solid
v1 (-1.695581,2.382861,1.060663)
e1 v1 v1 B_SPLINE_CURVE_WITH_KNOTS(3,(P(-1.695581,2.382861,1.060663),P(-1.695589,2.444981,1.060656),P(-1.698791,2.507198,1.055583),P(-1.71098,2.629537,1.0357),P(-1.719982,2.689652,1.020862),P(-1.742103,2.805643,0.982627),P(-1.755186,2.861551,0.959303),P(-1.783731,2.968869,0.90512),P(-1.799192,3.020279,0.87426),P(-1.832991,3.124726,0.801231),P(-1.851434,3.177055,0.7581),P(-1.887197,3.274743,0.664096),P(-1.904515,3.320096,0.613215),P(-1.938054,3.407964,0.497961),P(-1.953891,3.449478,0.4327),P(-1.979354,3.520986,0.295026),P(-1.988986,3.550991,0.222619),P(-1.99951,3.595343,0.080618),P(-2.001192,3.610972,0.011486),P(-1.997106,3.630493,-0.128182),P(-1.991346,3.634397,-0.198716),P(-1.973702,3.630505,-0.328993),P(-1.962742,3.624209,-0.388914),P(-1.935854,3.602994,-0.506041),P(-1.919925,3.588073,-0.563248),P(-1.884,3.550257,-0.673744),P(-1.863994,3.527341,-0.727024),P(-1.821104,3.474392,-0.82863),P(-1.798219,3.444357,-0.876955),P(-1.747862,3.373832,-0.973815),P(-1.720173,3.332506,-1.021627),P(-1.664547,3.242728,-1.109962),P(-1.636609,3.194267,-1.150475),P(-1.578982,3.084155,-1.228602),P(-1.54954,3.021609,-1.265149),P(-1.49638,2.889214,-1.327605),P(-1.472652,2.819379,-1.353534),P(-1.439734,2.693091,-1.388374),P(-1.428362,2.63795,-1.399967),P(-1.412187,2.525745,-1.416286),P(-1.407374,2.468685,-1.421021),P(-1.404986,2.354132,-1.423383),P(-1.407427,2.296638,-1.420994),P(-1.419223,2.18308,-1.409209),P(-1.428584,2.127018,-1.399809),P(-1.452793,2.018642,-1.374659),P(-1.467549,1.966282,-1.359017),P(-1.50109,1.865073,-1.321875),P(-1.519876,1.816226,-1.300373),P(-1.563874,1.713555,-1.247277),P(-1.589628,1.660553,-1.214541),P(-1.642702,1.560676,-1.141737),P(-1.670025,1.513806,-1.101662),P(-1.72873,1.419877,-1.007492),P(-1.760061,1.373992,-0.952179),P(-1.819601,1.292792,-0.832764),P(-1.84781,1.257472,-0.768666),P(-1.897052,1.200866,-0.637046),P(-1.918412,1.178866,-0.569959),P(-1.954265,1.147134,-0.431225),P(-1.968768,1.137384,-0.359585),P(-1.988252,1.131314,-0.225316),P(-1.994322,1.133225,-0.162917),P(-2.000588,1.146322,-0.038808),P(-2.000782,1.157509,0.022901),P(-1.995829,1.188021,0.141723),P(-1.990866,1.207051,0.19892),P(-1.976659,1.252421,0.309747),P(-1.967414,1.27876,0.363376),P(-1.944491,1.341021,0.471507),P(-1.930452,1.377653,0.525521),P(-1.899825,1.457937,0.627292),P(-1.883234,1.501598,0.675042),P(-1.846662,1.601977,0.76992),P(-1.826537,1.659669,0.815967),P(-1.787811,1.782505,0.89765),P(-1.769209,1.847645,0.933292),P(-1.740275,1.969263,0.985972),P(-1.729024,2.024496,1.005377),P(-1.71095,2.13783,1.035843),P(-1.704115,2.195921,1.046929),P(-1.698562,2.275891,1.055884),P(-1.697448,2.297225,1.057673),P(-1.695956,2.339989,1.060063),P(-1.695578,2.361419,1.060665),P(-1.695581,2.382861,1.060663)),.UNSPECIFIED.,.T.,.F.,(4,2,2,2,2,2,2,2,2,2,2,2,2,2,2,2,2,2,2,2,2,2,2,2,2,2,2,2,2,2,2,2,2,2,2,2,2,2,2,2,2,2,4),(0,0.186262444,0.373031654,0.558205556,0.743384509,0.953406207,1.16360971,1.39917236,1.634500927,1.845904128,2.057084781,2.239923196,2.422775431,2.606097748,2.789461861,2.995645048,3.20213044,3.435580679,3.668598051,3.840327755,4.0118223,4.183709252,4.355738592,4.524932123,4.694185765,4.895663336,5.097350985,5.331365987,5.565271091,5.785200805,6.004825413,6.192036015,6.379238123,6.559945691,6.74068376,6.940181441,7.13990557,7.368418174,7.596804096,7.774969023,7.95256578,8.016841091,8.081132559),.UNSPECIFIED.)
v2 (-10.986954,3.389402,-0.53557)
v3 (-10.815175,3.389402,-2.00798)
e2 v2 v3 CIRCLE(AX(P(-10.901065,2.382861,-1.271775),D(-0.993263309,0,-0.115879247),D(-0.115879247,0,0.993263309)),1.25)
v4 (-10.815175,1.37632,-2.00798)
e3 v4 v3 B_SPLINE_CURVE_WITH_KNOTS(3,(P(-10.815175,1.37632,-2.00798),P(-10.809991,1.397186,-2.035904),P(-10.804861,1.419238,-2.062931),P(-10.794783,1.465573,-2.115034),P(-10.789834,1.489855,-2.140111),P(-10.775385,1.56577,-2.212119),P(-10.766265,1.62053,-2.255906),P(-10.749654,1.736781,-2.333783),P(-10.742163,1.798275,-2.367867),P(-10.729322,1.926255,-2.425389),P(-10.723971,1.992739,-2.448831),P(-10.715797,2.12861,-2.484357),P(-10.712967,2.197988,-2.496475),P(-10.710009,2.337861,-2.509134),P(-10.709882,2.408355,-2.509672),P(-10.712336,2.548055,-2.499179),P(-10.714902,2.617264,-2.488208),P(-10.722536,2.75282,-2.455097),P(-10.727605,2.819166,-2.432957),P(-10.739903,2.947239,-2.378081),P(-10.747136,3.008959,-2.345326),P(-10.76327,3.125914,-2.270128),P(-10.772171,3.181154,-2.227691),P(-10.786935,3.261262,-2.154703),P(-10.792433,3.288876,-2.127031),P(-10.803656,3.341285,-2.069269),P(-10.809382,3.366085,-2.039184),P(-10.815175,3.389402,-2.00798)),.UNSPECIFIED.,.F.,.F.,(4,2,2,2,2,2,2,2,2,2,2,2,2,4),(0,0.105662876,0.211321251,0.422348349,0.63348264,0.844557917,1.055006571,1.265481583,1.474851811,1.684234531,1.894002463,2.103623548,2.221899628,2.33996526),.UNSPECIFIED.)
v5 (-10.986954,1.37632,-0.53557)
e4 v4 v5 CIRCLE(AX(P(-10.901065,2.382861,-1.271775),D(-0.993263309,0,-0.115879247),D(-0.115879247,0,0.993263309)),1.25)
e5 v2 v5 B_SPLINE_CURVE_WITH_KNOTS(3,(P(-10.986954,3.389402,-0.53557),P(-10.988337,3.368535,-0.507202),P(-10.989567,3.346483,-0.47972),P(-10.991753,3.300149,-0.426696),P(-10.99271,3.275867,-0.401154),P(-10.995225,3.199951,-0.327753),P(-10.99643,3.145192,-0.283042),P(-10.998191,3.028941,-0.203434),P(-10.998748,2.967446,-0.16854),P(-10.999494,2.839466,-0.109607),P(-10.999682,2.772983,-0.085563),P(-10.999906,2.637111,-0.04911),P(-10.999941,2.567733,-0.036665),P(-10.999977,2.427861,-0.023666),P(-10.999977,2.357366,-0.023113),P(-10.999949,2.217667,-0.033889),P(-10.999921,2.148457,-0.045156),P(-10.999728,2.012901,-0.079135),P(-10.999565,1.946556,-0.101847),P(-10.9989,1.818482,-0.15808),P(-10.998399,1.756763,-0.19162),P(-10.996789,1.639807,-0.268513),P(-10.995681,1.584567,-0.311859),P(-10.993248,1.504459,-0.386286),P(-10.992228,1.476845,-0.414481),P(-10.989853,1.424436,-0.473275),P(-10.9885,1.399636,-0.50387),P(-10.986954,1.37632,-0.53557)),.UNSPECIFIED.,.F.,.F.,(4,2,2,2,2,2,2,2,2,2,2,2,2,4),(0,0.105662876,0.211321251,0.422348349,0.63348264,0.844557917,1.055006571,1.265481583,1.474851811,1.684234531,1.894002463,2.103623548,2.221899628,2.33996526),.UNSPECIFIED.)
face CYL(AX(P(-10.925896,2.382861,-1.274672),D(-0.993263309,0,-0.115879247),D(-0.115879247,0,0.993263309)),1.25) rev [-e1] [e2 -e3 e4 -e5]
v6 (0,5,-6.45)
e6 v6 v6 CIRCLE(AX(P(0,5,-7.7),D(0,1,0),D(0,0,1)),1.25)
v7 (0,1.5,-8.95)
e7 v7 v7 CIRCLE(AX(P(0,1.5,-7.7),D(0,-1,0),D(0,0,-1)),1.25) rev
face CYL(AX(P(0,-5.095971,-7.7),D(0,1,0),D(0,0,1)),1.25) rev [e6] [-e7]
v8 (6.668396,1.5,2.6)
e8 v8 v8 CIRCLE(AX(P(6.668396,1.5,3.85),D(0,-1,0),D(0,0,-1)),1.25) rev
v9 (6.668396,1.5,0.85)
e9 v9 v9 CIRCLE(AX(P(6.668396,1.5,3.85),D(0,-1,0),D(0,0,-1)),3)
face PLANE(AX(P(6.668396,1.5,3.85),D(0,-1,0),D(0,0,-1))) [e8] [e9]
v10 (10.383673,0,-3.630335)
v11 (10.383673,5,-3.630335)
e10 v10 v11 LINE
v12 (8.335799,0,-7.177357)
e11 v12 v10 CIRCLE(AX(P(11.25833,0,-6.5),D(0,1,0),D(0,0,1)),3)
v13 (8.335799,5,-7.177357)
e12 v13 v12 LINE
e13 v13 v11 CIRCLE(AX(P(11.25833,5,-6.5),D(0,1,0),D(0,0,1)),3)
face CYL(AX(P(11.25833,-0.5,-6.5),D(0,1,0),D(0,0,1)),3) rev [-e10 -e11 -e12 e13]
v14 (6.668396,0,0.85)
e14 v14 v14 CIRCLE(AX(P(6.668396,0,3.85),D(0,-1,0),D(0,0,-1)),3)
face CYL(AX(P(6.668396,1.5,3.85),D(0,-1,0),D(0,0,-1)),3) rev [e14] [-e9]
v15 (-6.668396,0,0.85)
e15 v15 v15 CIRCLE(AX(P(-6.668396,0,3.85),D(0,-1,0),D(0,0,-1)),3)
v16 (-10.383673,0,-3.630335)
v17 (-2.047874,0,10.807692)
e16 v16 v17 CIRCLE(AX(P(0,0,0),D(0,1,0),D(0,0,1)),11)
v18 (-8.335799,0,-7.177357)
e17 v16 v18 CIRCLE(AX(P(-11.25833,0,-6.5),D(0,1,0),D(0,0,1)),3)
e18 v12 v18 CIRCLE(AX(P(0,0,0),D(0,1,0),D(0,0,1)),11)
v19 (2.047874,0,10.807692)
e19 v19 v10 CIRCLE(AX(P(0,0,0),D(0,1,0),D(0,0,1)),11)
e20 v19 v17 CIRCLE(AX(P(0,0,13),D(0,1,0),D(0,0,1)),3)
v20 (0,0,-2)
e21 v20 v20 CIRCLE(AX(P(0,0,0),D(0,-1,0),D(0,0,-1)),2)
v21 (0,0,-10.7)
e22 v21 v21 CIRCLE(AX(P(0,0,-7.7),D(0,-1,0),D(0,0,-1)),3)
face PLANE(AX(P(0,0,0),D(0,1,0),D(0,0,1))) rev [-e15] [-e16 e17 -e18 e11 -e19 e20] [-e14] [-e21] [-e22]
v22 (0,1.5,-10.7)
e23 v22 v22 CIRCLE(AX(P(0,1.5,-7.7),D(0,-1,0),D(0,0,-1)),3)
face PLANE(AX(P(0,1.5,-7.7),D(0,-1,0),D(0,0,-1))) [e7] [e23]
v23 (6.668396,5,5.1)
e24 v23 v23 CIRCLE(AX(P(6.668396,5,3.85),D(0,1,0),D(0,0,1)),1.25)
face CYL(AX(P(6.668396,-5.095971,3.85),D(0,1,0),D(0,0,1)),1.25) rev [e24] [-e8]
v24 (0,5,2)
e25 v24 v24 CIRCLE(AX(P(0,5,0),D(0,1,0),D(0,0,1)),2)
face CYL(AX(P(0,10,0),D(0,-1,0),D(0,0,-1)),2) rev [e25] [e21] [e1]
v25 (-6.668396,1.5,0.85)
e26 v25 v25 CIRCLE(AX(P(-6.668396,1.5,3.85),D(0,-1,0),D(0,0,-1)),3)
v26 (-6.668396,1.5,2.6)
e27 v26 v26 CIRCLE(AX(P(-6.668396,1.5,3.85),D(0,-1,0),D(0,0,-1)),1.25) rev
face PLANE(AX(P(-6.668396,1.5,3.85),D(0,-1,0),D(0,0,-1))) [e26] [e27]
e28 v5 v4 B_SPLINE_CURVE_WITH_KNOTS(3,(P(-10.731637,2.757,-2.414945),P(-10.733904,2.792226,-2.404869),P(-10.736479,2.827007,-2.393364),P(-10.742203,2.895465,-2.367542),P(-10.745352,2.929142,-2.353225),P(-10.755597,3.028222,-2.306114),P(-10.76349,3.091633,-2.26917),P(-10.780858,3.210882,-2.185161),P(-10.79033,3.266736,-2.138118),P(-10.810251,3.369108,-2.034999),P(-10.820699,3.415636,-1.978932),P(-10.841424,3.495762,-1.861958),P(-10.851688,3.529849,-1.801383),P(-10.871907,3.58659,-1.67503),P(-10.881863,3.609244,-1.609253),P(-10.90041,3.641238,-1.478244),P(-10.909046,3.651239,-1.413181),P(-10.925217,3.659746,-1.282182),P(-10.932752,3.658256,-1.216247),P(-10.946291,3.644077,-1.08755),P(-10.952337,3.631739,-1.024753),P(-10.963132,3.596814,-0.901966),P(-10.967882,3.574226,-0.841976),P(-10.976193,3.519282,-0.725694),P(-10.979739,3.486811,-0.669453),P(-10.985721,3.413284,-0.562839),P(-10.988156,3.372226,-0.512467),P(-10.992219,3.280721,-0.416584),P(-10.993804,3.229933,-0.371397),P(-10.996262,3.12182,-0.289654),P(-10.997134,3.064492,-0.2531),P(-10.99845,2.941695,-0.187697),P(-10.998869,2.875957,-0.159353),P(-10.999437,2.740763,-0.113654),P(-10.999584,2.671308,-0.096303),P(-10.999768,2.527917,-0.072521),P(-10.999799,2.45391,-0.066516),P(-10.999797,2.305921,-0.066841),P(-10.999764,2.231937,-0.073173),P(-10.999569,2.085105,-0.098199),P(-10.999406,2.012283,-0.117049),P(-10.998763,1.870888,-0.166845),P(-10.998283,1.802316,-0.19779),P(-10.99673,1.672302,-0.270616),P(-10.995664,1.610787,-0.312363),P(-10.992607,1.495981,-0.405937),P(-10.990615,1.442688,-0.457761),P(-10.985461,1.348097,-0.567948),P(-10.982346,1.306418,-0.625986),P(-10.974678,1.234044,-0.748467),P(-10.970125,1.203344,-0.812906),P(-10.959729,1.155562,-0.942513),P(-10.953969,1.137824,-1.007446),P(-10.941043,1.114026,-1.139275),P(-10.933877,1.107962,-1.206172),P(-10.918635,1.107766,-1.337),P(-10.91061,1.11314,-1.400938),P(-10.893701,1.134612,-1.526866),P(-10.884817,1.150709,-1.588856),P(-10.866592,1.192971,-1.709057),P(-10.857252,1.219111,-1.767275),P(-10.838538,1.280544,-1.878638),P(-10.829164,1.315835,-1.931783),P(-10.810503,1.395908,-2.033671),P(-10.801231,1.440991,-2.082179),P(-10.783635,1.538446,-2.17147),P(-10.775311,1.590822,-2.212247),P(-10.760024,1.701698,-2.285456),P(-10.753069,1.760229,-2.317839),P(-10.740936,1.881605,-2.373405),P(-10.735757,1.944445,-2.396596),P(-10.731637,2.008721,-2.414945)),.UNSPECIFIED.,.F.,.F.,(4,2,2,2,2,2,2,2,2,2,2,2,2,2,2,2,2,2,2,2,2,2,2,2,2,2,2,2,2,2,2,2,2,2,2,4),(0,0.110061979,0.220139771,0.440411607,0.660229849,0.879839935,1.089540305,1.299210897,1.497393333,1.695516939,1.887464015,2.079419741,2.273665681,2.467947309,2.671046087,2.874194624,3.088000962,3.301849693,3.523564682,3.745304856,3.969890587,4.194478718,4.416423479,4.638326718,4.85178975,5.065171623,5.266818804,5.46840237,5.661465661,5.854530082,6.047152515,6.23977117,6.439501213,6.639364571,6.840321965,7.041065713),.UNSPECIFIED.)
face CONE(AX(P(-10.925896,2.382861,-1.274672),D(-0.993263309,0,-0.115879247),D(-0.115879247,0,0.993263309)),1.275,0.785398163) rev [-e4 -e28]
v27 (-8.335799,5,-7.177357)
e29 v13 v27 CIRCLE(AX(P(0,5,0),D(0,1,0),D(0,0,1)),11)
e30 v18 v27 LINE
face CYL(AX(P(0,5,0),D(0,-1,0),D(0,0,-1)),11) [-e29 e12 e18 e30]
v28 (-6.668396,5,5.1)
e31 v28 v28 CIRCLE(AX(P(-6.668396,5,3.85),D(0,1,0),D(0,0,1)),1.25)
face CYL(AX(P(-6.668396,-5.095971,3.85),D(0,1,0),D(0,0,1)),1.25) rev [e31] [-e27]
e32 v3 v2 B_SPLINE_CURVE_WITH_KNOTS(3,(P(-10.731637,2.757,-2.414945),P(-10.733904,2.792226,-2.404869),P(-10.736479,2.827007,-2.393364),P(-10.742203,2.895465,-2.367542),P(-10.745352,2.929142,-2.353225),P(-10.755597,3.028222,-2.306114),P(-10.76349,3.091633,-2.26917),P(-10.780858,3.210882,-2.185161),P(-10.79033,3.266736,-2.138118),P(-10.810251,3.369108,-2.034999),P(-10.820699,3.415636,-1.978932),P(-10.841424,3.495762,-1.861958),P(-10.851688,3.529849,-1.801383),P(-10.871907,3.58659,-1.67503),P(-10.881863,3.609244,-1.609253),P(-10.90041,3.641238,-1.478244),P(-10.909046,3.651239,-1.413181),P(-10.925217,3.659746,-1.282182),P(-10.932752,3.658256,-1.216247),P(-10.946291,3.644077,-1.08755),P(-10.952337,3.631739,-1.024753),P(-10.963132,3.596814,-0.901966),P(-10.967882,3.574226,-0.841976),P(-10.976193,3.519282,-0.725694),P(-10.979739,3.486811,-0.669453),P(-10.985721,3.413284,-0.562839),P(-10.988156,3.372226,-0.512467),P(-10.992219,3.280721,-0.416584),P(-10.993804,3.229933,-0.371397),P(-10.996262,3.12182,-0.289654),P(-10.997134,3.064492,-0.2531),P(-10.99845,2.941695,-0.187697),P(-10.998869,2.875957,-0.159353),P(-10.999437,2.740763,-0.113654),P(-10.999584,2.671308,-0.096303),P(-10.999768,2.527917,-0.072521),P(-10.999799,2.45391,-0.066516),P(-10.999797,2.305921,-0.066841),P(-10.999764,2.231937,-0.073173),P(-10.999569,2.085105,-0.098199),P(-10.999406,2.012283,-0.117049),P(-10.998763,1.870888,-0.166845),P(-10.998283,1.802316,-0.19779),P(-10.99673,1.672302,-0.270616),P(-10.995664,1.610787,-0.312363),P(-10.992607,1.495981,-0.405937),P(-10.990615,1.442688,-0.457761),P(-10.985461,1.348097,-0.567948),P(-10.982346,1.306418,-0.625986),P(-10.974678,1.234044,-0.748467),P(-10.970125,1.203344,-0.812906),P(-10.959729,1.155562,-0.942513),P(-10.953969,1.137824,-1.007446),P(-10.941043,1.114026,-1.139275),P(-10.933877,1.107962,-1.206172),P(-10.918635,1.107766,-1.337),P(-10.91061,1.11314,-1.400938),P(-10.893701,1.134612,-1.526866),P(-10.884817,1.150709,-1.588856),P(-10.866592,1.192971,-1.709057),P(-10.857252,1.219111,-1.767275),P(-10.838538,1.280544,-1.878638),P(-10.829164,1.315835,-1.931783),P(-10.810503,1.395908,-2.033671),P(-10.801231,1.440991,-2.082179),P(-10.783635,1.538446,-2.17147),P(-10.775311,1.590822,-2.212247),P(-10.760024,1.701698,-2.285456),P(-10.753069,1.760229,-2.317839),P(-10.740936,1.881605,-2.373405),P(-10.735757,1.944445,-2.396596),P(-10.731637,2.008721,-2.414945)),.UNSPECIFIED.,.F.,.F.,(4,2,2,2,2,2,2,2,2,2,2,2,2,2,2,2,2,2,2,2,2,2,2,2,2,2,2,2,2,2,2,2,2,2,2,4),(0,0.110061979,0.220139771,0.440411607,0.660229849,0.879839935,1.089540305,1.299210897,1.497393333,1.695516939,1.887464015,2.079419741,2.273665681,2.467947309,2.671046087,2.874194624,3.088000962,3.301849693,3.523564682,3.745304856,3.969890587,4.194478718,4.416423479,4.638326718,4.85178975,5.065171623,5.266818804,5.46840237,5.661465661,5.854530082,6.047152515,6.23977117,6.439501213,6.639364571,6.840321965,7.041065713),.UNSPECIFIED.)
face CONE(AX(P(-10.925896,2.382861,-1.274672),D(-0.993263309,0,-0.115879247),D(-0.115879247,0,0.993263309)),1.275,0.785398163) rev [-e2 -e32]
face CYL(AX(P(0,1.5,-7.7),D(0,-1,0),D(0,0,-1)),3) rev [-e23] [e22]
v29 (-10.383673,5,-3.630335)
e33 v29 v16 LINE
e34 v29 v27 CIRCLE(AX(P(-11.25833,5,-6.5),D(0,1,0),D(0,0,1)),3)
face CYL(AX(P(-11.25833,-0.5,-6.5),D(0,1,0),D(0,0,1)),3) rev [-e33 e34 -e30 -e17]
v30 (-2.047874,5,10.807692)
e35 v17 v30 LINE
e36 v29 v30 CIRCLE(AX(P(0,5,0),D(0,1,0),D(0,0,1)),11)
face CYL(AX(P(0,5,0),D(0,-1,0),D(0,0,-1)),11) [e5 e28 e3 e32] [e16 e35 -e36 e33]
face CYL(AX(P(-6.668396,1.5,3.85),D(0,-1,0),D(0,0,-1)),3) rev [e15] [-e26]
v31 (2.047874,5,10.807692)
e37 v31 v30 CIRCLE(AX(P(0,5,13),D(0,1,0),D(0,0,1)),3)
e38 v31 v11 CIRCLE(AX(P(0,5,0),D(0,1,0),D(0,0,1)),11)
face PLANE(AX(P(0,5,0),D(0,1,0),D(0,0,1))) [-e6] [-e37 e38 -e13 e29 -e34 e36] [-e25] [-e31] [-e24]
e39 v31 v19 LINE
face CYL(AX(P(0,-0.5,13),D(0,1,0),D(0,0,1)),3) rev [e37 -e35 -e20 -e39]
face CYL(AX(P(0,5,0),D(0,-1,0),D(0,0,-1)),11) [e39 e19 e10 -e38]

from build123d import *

# Parameters (mm, degrees)
ESBO_O1_R                = 11
RESSALTO_EXTRUS_O1_DEPTH = 5
ESBO_O3_R                = 1.25
CORTE_EXTRUS_O1_DEPTH    = 10.095971114
ESBO_O22_R               = 3
CORTE_EXTRUS_O6_DEPTH    = 5.5
ESBO_O23_R               = 3
CORTE_EXTRUS_O7_DEPTH    = 1.5
ESBO_O27_R               = 2
CORTE_EXTRUS_O8_DEPTH    = 10


# Read off the part's stored shape, not the designer's step: Broca de rosquear para tarraxa de M3x0.52
with BuildPart() as part:
    # Esboço1 → Ressalto-extrusão1 (new body)
    with BuildSketch(Plane(origin=(0, 0, 0), x_dir=(1, 0, 0), z_dir=(0, 1, 0))):
        with Locations(Location((0, 0, 0), (0, 0, 270))):
            Circle(ESBO_O1_R)
    extrude(amount=RESSALTO_EXTRUS_O1_DEPTH)

    # Esboço3 → Corte-extrusão1 (cut)
    with BuildSketch(Plane(origin=(0, 5, 0), x_dir=(1, 0, 0), z_dir=(0, 1, 0))):
        with Locations(Location((0, 7.7, 0), (0, 0, 270))):
            Circle(ESBO_O3_R)
        with Locations(Location((6.668395609, -3.85, 0), (0, 0, 270))):
            Circle(ESBO_O3_R)
        with Locations(Location((-6.668395609, -3.85, 0), (0, 0, 270))):
            Circle(ESBO_O3_R)
    extrude(amount=-CORTE_EXTRUS_O1_DEPTH, mode=Mode.SUBTRACT)

    # Esboço22 → Corte-extrusão6 (cut)
    with BuildSketch(Plane(origin=(0, 5, 0), x_dir=(1, 0, 0), z_dir=(0, 1, 0))):
        with Locations((-11.258330249, 6.5)):
            Circle(ESBO_O22_R)
        with Locations((0, -13)):
            Circle(ESBO_O22_R)
        with Locations((11.258330249, 6.5)):
            Circle(ESBO_O22_R)
    extrude(amount=-CORTE_EXTRUS_O6_DEPTH, mode=Mode.SUBTRACT)

    # Esboço23 → Corte-extrusão7 (cut)
    with BuildSketch(Plane(origin=(0, 0, 0), x_dir=(-1, 0, 0), z_dir=(0, -1, 0))):
        with Locations(Location((-6.668395609, -3.85, 0), (0, 0, 90))):
            Circle(ESBO_O23_R)
        with Locations(Location((6.668395609, -3.85, 0), (0, 0, 90))):
            Circle(ESBO_O23_R)
        with Locations(Location((0, 7.7, 0), (0, 0, 90))):
            Circle(ESBO_O23_R)
    extrude(amount=-CORTE_EXTRUS_O7_DEPTH, mode=Mode.SUBTRACT)

    # Esboço27 → Corte-extrusão8 (cut)
    with BuildSketch(Plane.XZ):
        with Locations(Location((0, 0, 0), (0, 0, 270))):
            Circle(ESBO_O27_R)
    extrude(amount=-CORTE_EXTRUS_O8_DEPTH, mode=Mode.SUBTRACT)

    # Broca de rosquear para tarraxa de M3 2 → Broca de rosquear para tarraxa de M3x0.52 (revolve, cut)
    with BuildSketch(Plane(origin=(0, 2.382860609, 0), x_dir=(0, 1, 0), z_dir=(0.11587924714300103, 0, -0.9932633085348372))):
        Polygon((0, -11.00002072), (1.275019909, -11.000019909), (1.249997575, -10.974997575), (1.25, -1.561025492), (0, -1.561025492), align=None)
    revolve(axis=Axis((0, 2.382860609, 0), (0.9932633085348372, 0, 0.11587924714300103)), mode=Mode.SUBTRACT)


solid = part.part
